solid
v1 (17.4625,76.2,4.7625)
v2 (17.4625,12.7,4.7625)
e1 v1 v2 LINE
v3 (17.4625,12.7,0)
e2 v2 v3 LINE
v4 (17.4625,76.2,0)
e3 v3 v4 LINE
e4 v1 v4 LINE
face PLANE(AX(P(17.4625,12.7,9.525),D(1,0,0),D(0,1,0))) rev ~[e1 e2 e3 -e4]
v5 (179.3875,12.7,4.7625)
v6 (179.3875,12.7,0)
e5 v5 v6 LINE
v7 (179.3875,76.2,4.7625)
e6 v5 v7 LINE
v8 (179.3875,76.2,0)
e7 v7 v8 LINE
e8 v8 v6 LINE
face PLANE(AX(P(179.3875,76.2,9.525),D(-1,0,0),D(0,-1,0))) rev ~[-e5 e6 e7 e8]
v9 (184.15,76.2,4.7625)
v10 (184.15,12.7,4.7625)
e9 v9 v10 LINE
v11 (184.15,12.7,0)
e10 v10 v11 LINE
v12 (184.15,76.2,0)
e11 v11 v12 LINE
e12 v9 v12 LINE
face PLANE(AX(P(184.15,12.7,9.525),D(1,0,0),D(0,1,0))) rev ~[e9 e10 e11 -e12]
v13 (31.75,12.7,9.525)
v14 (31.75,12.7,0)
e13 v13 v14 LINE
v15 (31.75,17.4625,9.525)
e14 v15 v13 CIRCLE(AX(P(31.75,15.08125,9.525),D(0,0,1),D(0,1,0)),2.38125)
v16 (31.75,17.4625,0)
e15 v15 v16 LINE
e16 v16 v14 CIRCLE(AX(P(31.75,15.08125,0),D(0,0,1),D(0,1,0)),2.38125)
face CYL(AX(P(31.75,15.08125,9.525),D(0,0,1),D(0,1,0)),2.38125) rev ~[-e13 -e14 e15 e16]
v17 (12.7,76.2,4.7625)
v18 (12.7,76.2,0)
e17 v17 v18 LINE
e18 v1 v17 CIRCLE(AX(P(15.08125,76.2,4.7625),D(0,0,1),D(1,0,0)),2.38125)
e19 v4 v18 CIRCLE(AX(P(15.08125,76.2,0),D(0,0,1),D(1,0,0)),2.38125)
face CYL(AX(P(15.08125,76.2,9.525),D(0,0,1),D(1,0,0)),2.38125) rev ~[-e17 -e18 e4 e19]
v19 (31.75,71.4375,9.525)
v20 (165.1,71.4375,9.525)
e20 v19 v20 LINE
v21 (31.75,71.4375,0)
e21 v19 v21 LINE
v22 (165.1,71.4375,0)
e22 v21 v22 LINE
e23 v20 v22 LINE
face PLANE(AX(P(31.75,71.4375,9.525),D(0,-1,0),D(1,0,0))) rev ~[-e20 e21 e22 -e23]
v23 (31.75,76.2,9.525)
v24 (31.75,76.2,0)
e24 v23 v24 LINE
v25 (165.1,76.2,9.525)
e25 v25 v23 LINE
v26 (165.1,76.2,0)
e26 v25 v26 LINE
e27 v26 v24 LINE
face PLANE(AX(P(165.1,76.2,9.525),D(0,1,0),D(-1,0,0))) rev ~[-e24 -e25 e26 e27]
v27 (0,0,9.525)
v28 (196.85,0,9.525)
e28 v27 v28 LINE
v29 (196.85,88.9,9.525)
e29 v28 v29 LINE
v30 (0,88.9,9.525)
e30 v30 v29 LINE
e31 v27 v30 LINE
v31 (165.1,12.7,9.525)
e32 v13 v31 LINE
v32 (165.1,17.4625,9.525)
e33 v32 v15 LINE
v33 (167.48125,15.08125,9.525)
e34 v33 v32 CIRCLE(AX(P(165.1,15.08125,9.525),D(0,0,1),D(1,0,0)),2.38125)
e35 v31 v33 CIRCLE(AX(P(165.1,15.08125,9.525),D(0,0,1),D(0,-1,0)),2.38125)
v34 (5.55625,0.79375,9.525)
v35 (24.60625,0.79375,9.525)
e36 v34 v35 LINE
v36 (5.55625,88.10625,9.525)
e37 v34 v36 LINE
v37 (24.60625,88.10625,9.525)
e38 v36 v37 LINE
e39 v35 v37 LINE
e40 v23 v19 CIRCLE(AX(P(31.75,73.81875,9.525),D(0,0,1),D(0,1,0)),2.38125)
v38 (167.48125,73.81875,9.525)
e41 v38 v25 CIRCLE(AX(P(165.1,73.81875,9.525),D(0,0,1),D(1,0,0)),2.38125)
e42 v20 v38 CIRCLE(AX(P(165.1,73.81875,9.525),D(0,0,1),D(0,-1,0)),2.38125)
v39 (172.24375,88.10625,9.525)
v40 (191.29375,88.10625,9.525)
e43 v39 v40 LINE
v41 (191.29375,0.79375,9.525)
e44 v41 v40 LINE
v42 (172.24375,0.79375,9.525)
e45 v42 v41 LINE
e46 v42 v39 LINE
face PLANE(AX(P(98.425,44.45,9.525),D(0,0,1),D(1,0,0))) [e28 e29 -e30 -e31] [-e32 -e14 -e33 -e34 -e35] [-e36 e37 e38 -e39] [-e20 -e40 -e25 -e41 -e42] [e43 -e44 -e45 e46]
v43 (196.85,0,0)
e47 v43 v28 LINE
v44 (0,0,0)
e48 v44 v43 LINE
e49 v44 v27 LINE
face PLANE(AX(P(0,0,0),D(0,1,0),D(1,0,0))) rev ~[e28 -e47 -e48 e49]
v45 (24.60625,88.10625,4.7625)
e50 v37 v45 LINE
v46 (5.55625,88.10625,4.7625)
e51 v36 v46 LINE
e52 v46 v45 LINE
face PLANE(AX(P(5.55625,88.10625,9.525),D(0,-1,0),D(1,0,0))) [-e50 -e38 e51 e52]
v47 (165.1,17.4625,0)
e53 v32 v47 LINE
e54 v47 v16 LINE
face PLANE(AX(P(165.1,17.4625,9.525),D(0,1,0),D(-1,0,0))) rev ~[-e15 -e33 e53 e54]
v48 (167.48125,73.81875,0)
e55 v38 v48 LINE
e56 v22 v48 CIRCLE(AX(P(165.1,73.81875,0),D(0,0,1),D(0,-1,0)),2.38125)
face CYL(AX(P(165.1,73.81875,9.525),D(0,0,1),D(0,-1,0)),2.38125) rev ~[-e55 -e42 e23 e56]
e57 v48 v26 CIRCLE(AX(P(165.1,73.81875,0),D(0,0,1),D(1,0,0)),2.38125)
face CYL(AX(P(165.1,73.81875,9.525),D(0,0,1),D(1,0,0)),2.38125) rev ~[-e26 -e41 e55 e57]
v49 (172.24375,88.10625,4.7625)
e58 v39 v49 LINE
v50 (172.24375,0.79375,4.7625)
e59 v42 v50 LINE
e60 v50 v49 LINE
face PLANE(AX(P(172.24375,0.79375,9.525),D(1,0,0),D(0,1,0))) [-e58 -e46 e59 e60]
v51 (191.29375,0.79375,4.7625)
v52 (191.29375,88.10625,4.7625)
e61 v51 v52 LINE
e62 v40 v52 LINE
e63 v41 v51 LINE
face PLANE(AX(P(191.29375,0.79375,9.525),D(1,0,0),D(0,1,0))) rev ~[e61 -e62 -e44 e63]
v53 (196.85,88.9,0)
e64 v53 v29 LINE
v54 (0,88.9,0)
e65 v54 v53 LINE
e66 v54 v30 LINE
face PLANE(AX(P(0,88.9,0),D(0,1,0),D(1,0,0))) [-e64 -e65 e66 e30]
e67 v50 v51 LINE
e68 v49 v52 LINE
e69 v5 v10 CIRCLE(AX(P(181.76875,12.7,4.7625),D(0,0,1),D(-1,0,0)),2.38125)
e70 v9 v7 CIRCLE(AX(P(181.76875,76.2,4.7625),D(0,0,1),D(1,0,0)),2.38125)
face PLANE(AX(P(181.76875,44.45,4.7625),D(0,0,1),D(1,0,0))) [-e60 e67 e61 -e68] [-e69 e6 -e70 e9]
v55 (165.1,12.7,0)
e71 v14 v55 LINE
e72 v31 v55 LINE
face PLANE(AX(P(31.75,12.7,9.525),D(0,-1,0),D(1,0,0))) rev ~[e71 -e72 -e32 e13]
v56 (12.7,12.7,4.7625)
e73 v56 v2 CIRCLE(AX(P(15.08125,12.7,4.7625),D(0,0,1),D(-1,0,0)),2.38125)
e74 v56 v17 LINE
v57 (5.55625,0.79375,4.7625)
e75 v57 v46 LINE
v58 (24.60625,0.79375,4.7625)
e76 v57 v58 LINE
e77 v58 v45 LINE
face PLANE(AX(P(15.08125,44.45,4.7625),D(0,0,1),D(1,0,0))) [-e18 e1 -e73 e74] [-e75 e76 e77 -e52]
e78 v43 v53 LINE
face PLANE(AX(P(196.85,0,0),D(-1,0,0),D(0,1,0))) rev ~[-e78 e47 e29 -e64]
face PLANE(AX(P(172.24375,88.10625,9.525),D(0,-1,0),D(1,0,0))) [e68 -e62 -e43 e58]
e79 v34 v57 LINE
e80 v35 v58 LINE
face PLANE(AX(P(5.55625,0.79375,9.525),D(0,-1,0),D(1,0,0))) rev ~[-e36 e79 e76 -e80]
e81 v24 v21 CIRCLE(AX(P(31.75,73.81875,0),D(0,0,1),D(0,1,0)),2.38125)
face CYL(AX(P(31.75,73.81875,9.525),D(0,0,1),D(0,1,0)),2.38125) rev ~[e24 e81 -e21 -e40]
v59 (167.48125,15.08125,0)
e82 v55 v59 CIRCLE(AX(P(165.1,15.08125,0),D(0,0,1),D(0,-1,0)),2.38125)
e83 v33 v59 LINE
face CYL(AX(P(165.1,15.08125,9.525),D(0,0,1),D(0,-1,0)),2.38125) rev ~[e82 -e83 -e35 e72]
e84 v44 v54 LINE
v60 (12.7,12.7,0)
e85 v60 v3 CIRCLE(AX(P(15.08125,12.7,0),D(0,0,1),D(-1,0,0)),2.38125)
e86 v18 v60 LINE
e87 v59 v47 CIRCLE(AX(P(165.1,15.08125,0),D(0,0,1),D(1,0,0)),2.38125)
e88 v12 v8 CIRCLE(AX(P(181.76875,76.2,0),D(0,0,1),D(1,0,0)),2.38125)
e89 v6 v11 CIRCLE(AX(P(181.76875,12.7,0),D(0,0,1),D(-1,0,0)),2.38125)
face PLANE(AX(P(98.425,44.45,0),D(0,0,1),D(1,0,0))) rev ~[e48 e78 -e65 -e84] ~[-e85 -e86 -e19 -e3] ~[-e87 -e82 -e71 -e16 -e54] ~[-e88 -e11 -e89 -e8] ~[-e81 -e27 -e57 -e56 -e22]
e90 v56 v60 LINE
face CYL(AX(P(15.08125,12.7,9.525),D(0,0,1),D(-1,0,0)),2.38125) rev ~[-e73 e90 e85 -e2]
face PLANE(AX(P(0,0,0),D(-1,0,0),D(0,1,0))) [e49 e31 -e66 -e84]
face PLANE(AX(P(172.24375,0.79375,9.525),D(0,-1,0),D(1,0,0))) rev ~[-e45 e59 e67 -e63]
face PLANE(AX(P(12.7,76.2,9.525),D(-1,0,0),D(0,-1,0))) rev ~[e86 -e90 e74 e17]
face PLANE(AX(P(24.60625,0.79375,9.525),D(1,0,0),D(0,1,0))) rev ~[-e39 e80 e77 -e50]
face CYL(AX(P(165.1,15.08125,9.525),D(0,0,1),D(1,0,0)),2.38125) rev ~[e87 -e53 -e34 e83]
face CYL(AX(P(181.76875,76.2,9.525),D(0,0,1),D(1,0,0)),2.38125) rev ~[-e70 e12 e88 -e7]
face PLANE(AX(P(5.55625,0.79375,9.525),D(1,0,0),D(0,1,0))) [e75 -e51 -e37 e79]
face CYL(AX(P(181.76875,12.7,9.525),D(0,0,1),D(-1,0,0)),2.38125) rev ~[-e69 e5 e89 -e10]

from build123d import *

# Parameters (mm, degrees)
F0_W     = 196.85
F0_H     = 88.9
F1_DEPTH = 9.525
F3_DEPTH = 25.4
F4_W     = 19.05
F4_H     = 87.3125
F5_DEPTH = 4.7625


# Not quite as in the source:
# - a length typed as a fraction of an inch, garbled in the dataset ("3 / 203.2 mm" for 3/8 in), is restored


with BuildPart() as f1:
    # F0 (on Top) → F1 (new body)
    with BuildSketch(Plane.XY):
        with Locations((98.425, 44.45)):
            Rectangle(F0_W, F0_H)
    extrude(amount=F1_DEPTH)

    # F2 (on face) → F3 (cut)
    with BuildSketch(Plane.XY.offset(9.525)):
        with BuildLine():
            ThreePointArc((17.4625, 12.7), (15.08125, 15.08125), (12.7, 12.7))
            Line((12.7, 12.7), (17.4625, 12.7))
        make_face()
        with BuildLine():
            Line((12.7, 76.2), (12.7, 12.7))
            ThreePointArc((12.7, 12.7), (15.08125, 15.08125), (17.4625, 12.7))
            Line((17.4625, 12.7), (17.4625, 76.2))
            ThreePointArc((17.4625, 76.2), (15.08125, 73.81875), (12.7, 76.2))
        make_face()
        with BuildLine():
            Line((17.4625, 12.7), (12.7, 12.7))
            ThreePointArc((12.7, 12.7), (15.08125, 10.31875), (17.4625, 12.7))
        make_face()
        with BuildLine():
            ThreePointArc((17.4625, 76.2), (15.08125, 78.58125), (12.7, 76.2))
            Line((12.7, 76.2), (17.4625, 76.2))
        make_face()
        with BuildLine():
            Line((17.4625, 76.2), (12.7, 76.2))
            ThreePointArc((12.7, 76.2), (15.08125, 73.81875), (17.4625, 76.2))
        make_face()
        with BuildLine():
            ThreePointArc((179.3875, 12.7), (181.76875, 10.31875), (184.15, 12.7))
            Line((184.15, 12.7), (179.3875, 12.7))
        make_face()
        with BuildLine():
            ThreePointArc((179.3875, 12.7), (181.76875, 15.08125), (184.15, 12.7))
            Line((184.15, 12.7), (184.15, 76.2))
            ThreePointArc((184.15, 76.2), (181.76875, 73.81875), (179.3875, 76.2))
            Line((179.3875, 76.2), (179.3875, 12.7))
        make_face()
        with BuildLine():
            Line((179.3875, 12.7), (184.15, 12.7))
            ThreePointArc((184.15, 12.7), (181.76875, 15.08125), (179.3875, 12.7))
        make_face()
        with BuildLine():
            ThreePointArc((179.3875, 76.2), (181.76875, 73.81875), (184.15, 76.2))
            Line((184.15, 76.2), (179.3875, 76.2))
        make_face()
        with BuildLine():
            Line((179.3875, 76.2), (184.15, 76.2))
            ThreePointArc((184.15, 76.2), (181.76875, 78.58125), (179.3875, 76.2))
        make_face()
        with BuildLine():
            ThreePointArc((34.13125, 73.81875), (33.4337980227, 75.5025480227), (31.75, 76.2))
            Line((31.75, 76.2), (31.75, 71.4375))
            ThreePointArc((31.75, 71.4375), (33.4337980227, 72.1349519773), (34.13125, 73.81875))
        make_face()
        with BuildLine():
            Line((165.1, 76.2), (31.75, 76.2))
            ThreePointArc((31.75, 76.2), (33.4337980227, 75.5025480227), (34.13125, 73.81875))
            ThreePointArc((34.13125, 73.81875), (33.4337980227, 72.1349519773), (31.75, 71.4375))
            Line((31.75, 71.4375), (165.1, 71.4375))
            ThreePointArc((165.1, 71.4375), (162.71875, 73.81875), (165.1, 76.2))
        make_face()
        with BuildLine():
            Line((31.75, 71.4375), (31.75, 76.2))
            ThreePointArc((31.75, 76.2), (29.36875, 73.81875), (31.75, 71.4375))
        make_face()
        with BuildLine():
            ThreePointArc((167.48125, 73.81875), (166.7837980227, 75.5025480227), (165.1, 76.2))
            Line((165.1, 76.2), (165.1, 71.4375))
            ThreePointArc((165.1, 71.4375), (166.7837980227, 72.1349519773), (167.48125, 73.81875))
        make_face()
        with BuildLine():
            Line((165.1, 71.4375), (165.1, 76.2))
            ThreePointArc((165.1, 76.2), (162.71875, 73.81875), (165.1, 71.4375))
        make_face()
        with BuildLine():
            ThreePointArc((34.13125, 15.08125), (33.4337980227, 16.7650480227), (31.75, 17.4625))
            Line((31.75, 17.4625), (31.75, 12.7))
            ThreePointArc((31.75, 12.7), (33.4337980227, 13.3974519773), (34.13125, 15.08125))
        make_face()
        with BuildLine():
            Line((165.1, 17.4625), (31.75, 17.4625))
            ThreePointArc((31.75, 17.4625), (33.4337980227, 16.7650480227), (34.13125, 15.08125))
            ThreePointArc((34.13125, 15.08125), (33.4337980227, 13.3974519773), (31.75, 12.7))
            Line((31.75, 12.7), (165.1, 12.7))
            ThreePointArc((165.1, 12.7), (162.71875, 15.08125), (165.1, 17.4625))
        make_face()
        with BuildLine():
            Line((31.75, 12.7), (31.75, 17.4625))
            ThreePointArc((31.75, 17.4625), (29.36875, 15.08125), (31.75, 12.7))
        make_face()
        with BuildLine():
            ThreePointArc((167.48125, 15.08125), (166.7837980227, 16.7650480227), (165.1, 17.4625))
            Line((165.1, 17.4625), (165.1, 12.7))
            ThreePointArc((165.1, 12.7), (166.7837980227, 13.3974519773), (167.48125, 15.08125))
        make_face()
        with BuildLine():
            Line((165.1, 12.7), (165.1, 17.4625))
            ThreePointArc((165.1, 17.4625), (162.71875, 15.08125), (165.1, 12.7))
        make_face()
    extrude(amount=-F3_DEPTH, mode=Mode.SUBTRACT)

    # F4 (on face) → F5 (cut)
    with BuildSketch(Plane.XY.offset(9.525)):
        with Locations((15.08125, 44.45)):
            Rectangle(F4_W, F4_H)
        with Locations((181.76875, 44.45)):
            Rectangle(F4_W, F4_H)
    extrude(amount=-F5_DEPTH, mode=Mode.SUBTRACT)


solid = f1.part
